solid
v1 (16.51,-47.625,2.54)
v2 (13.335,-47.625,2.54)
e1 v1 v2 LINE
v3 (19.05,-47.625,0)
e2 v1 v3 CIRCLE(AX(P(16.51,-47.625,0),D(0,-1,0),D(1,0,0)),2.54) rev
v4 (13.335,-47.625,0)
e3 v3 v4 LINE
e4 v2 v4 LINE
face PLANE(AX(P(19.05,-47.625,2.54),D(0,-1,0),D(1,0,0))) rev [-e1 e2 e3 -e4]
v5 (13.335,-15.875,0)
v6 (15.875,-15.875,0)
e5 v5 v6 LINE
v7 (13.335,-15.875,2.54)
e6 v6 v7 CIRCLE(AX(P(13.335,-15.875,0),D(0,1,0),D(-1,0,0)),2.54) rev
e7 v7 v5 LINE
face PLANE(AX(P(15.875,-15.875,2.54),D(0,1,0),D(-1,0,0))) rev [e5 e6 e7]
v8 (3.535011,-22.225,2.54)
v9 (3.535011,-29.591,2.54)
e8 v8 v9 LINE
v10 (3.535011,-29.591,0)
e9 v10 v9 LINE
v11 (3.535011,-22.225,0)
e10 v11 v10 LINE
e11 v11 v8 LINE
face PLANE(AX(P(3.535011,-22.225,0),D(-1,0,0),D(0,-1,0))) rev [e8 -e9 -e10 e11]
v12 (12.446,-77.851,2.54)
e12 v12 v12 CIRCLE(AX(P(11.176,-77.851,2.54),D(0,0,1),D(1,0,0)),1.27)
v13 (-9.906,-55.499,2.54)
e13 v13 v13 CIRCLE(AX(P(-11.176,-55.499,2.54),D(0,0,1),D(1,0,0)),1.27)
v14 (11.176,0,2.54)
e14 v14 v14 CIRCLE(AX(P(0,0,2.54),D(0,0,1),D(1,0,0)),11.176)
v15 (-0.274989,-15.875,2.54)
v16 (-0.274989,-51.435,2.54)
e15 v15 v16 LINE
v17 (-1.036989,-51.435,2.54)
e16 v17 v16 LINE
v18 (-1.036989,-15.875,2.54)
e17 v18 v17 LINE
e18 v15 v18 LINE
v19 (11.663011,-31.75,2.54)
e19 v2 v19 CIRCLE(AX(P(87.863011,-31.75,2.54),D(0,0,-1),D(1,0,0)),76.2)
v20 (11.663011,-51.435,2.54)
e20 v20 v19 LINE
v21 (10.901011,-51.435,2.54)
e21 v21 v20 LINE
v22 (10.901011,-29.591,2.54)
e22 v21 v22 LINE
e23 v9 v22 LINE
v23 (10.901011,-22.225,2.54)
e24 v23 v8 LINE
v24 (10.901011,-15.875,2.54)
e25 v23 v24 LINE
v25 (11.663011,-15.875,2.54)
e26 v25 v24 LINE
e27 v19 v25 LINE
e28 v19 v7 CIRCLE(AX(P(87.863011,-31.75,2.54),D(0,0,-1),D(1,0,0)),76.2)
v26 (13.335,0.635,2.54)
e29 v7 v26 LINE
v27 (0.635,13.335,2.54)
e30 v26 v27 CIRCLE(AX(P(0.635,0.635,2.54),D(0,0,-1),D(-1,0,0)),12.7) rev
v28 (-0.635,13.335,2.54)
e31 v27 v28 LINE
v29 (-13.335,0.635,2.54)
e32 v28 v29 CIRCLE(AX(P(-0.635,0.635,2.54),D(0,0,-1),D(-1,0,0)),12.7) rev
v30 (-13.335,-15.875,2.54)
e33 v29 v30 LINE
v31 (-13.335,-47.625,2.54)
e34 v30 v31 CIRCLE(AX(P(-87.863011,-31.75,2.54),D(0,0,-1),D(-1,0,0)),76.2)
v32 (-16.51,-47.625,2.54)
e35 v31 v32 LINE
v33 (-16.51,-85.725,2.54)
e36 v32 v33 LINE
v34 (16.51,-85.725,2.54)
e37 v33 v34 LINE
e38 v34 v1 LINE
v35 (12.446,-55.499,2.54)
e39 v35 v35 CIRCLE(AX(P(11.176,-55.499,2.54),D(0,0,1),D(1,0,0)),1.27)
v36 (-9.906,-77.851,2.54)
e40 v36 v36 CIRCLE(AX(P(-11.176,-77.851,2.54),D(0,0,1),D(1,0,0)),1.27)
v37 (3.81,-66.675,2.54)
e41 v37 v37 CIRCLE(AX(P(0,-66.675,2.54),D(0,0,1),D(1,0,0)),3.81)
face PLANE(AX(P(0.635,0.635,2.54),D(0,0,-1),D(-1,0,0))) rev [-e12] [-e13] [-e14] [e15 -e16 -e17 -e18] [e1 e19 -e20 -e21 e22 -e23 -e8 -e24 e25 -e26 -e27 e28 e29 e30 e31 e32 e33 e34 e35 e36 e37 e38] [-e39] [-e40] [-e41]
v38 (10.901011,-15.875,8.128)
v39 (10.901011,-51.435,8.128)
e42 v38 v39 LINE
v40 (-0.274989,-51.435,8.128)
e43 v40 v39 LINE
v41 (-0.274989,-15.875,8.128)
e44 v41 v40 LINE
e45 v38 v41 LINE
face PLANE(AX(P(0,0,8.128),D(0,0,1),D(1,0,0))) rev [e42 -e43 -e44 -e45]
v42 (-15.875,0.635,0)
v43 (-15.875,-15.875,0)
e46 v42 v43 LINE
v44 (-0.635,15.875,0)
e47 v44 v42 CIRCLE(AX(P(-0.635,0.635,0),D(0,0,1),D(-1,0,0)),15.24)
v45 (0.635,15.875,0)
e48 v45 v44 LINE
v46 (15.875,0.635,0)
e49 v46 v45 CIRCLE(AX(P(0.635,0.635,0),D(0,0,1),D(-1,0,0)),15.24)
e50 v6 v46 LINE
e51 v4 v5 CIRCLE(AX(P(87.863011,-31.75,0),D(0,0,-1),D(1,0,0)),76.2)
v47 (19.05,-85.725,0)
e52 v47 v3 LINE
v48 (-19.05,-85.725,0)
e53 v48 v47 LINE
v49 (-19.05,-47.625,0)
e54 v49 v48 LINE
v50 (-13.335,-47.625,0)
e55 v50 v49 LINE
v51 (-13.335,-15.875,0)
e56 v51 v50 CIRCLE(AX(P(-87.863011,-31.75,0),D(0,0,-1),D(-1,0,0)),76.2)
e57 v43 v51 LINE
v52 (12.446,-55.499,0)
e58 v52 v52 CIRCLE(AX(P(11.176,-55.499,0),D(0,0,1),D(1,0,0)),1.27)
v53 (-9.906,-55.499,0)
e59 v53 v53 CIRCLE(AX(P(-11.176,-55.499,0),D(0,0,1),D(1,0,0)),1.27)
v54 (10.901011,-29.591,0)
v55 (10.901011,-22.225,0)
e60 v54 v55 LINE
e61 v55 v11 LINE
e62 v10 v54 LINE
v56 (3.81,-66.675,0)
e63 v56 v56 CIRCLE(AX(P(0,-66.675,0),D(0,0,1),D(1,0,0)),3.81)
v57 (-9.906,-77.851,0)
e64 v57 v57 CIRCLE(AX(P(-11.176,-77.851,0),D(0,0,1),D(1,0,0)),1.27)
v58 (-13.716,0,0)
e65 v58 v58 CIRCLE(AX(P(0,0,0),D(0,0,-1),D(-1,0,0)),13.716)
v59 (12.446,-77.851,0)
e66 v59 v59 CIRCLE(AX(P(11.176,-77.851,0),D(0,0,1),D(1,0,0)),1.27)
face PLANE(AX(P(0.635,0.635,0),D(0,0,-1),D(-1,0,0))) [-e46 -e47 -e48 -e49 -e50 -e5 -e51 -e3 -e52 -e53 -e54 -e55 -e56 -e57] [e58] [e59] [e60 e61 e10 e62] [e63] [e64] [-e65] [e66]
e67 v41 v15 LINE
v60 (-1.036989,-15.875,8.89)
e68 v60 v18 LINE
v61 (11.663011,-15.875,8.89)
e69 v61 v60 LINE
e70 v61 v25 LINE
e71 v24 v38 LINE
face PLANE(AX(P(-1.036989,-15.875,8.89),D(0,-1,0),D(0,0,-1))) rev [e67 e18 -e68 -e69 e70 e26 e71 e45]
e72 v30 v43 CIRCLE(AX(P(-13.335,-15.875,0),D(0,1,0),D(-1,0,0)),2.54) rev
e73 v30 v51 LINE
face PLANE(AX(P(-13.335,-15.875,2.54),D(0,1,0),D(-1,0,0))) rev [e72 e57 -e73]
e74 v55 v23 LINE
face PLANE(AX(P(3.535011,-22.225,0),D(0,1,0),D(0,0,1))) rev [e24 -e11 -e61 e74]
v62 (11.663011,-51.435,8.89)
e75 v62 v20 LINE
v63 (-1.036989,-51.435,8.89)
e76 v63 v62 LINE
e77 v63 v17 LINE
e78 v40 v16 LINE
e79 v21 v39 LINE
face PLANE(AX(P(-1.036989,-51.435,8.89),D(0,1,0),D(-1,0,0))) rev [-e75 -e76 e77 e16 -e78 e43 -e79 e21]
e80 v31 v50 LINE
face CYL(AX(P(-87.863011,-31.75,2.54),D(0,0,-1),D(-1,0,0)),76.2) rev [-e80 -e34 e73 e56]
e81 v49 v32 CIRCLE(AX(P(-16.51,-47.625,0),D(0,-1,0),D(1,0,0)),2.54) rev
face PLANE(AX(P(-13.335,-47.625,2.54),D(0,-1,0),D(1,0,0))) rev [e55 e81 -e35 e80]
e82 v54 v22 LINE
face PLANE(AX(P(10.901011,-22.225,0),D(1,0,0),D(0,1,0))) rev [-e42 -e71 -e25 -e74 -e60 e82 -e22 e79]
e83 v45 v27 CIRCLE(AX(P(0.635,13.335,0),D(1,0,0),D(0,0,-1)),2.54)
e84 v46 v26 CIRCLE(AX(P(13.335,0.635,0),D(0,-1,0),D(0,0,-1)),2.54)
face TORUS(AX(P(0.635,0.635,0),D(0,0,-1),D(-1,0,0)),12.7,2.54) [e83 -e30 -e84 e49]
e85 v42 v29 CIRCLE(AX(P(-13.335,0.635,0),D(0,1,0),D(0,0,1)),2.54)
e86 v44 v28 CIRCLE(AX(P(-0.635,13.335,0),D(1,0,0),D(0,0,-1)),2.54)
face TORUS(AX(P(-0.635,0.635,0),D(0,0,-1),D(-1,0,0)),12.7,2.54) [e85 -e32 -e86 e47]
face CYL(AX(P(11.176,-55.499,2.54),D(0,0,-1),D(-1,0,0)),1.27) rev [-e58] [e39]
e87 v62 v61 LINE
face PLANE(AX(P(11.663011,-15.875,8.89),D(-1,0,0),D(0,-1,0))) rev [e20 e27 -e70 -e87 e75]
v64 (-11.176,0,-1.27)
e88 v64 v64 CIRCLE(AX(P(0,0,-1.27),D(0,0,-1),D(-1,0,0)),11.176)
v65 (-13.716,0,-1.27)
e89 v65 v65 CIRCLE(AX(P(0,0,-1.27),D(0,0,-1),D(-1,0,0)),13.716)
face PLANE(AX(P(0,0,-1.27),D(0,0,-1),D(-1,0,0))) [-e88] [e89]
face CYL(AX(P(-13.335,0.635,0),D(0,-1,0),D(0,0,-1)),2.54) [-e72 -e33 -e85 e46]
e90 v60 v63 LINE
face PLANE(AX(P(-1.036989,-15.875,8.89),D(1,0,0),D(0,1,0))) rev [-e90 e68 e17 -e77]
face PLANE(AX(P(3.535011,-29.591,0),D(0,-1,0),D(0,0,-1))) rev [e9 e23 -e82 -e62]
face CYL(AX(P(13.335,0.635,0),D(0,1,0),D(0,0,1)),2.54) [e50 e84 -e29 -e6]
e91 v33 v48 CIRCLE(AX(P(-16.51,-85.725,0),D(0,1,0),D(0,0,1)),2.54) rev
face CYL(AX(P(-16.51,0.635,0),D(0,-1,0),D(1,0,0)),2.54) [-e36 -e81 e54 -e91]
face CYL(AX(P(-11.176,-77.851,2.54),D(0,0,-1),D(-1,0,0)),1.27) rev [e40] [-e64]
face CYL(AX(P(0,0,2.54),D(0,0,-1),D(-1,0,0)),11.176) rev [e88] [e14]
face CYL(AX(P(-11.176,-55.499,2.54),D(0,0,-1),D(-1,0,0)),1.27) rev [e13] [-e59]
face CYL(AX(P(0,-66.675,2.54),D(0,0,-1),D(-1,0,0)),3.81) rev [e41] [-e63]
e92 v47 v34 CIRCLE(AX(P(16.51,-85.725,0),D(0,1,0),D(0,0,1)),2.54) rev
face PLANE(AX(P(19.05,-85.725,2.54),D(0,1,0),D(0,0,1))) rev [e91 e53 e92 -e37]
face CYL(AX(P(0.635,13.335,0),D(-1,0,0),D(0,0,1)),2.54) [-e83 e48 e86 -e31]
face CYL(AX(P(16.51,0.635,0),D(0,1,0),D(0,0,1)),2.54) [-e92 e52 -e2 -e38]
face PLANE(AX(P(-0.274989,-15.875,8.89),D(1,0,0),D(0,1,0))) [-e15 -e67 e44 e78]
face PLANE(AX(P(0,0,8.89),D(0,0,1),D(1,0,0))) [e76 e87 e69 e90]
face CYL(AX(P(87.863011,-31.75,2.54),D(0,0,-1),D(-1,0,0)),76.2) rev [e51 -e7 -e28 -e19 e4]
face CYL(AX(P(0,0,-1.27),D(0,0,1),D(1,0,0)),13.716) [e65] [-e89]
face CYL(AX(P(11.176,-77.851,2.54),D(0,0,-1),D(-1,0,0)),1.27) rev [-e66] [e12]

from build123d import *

# Parameters (mm, degrees)
SKETCH1_R           = 11.176
SKETCH1_R_2         = 1.27
SKETCH1_R_3         = 3.81
BOSS_EXTRUDE1_DEPTH = 2.54
FILLET2_R           = 2.54
FILLET3_R           = 2.54
BOSS_EXTRUDE2_START = 1.27
SKETCH2_R           = 13.716
SKETCH2_R_2         = 11.176
BOSS_EXTRUDE2_DEPTH = 1.27
SKETCH3_W           = 7.366
SKETCH3_H           = 7.366
CUT_EXTRUDE1_DEPTH  = 2.54
SKETCH4_W           = 12.7
SKETCH4_H           = 35.56
SKETCH4_W_2         = 11.176
SKETCH4_H_2         = 34.036
EXTRUDE_THIN1_DEPTH = 6.35
SKETCH5_W           = 11.176
SKETCH5_H           = 6.35
CUT_EXTRUDE2_DEPTH  = 38.1
SKETCH6_W           = 12.7
SKETCH6_H           = 35.56
BOSS_EXTRUDE3_DEPTH = 0.762


with BuildPart() as part:
    # Sketch1 → Boss-Extrude1 (new body)
    with BuildSketch(Plane.XY):
        with BuildLine():
            Line((-13.335, -47.625), (-19.05, -47.625))
            Line((-19.05, -47.625), (-19.05, -85.725))
            Line((-19.05, -85.725), (19.05, -85.725))
            Line((19.05, -85.725), (19.05, -47.625))
            Line((19.05, -47.625), (13.335, -47.625))
            ThreePointArc((13.335, -47.625), (11.663010674, -31.75), (13.335, -15.875))
            Line((13.335, -15.875), (15.875, -15.875))
            Line((15.875, -15.875), (15.875, 0.635))
            ThreePointArc((15.875, 0.635), (11.411307345, 11.411307345), (0.635, 15.875))
            Line((0.635, 15.875), (-0.635, 15.875))
            ThreePointArc((-0.635, 15.875), (-11.411307345, 11.411307345), (-15.875, 0.635))
            Line((-15.875, 0.635), (-15.875, -15.875))
            Line((-15.875, -15.875), (-13.335, -15.875))
            ThreePointArc((-13.335, -15.875), (-11.663010674, -31.75), (-13.335, -47.625))
        make_face()
        Circle(SKETCH1_R, mode=Mode.SUBTRACT)
        with Locations((11.176, -55.499)):
            Circle(SKETCH1_R_2, mode=Mode.SUBTRACT)
        with Locations((11.176, -77.851)):
            Circle(SKETCH1_R_2, mode=Mode.SUBTRACT)
        with Locations((-11.176, -77.851)):
            Circle(SKETCH1_R_2, mode=Mode.SUBTRACT)
        with Locations((-11.176, -55.499)):
            Circle(SKETCH1_R_2, mode=Mode.SUBTRACT)
        with Locations((0, -66.675)):
            Circle(SKETCH1_R_3, mode=Mode.SUBTRACT)
    extrude(amount=BOSS_EXTRUDE1_DEPTH)

    # Fillet2
    fillet2_edges = [part.edges().sort_by_distance(p)[0] for p in [
        (19.05, -66.675, 2.54),
        (-19.05, -66.675, 2.54),
    ]]
    fillet(fillet2_edges, radius=FILLET2_R - 0.0001)  # a hair under: the kernel refuses the full size

    # Fillet3
    fillet3_edges = [part.edges().sort_by_distance(p)[0] for p in [
        (15.875, -7.62, 2.54),
        (11.411307345, 11.411307345, 2.54),
        (0, 15.875, 2.54),
        (-11.411307345, 11.411307345, 2.54),
        (-15.875, -7.62, 2.54),
    ]]
    fillet(fillet3_edges, radius=FILLET3_R - 0.0001)  # a hair under: the kernel refuses the full size

    # Sketch2 → Boss-Extrude2 (add)
    with BuildSketch(Plane(origin=(0, 0, 0), x_dir=(-1, 0, 0), z_dir=(0, 0, -1)).offset(BOSS_EXTRUDE2_START)):
        Circle(SKETCH2_R)
        Circle(SKETCH2_R_2, mode=Mode.SUBTRACT)
    extrude(amount=-BOSS_EXTRUDE2_DEPTH)

    # Sketch3 → Cut-Extrude1 (cut)
    with BuildSketch(Plane.XY.offset(2.54)):
        with Locations((7.218010674, -25.908)):
            Rectangle(SKETCH3_W, SKETCH3_H)
    extrude(amount=-CUT_EXTRUDE1_DEPTH, mode=Mode.SUBTRACT)

    # Sketch4 → Extrude-Thin1 (add)
    with BuildSketch(Plane.XY.offset(2.54)):
        with Locations((5.313010674, -33.655)):
            Rectangle(SKETCH4_W, SKETCH4_H)
        with Locations((5.313010674, -33.655)):
            Rectangle(SKETCH4_W_2, SKETCH4_H_2, mode=Mode.SUBTRACT)
    extrude(amount=EXTRUDE_THIN1_DEPTH)

    # Sketch5 → Cut-Extrude2 (cut)
    with BuildSketch(Plane.XZ.offset(51.435)):
        with Locations((5.313010674, 5.715)):
            Rectangle(SKETCH5_W, SKETCH5_H)
    extrude(amount=-CUT_EXTRUDE2_DEPTH, mode=Mode.SUBTRACT)

    # Sketch6 → Boss-Extrude3 (add)
    with BuildSketch(Plane.XY.offset(8.89)):
        with Locations((5.313010674, -33.655)):
            Rectangle(SKETCH6_W, SKETCH6_H)
    extrude(amount=-BOSS_EXTRUDE3_DEPTH)


solid = part.part
